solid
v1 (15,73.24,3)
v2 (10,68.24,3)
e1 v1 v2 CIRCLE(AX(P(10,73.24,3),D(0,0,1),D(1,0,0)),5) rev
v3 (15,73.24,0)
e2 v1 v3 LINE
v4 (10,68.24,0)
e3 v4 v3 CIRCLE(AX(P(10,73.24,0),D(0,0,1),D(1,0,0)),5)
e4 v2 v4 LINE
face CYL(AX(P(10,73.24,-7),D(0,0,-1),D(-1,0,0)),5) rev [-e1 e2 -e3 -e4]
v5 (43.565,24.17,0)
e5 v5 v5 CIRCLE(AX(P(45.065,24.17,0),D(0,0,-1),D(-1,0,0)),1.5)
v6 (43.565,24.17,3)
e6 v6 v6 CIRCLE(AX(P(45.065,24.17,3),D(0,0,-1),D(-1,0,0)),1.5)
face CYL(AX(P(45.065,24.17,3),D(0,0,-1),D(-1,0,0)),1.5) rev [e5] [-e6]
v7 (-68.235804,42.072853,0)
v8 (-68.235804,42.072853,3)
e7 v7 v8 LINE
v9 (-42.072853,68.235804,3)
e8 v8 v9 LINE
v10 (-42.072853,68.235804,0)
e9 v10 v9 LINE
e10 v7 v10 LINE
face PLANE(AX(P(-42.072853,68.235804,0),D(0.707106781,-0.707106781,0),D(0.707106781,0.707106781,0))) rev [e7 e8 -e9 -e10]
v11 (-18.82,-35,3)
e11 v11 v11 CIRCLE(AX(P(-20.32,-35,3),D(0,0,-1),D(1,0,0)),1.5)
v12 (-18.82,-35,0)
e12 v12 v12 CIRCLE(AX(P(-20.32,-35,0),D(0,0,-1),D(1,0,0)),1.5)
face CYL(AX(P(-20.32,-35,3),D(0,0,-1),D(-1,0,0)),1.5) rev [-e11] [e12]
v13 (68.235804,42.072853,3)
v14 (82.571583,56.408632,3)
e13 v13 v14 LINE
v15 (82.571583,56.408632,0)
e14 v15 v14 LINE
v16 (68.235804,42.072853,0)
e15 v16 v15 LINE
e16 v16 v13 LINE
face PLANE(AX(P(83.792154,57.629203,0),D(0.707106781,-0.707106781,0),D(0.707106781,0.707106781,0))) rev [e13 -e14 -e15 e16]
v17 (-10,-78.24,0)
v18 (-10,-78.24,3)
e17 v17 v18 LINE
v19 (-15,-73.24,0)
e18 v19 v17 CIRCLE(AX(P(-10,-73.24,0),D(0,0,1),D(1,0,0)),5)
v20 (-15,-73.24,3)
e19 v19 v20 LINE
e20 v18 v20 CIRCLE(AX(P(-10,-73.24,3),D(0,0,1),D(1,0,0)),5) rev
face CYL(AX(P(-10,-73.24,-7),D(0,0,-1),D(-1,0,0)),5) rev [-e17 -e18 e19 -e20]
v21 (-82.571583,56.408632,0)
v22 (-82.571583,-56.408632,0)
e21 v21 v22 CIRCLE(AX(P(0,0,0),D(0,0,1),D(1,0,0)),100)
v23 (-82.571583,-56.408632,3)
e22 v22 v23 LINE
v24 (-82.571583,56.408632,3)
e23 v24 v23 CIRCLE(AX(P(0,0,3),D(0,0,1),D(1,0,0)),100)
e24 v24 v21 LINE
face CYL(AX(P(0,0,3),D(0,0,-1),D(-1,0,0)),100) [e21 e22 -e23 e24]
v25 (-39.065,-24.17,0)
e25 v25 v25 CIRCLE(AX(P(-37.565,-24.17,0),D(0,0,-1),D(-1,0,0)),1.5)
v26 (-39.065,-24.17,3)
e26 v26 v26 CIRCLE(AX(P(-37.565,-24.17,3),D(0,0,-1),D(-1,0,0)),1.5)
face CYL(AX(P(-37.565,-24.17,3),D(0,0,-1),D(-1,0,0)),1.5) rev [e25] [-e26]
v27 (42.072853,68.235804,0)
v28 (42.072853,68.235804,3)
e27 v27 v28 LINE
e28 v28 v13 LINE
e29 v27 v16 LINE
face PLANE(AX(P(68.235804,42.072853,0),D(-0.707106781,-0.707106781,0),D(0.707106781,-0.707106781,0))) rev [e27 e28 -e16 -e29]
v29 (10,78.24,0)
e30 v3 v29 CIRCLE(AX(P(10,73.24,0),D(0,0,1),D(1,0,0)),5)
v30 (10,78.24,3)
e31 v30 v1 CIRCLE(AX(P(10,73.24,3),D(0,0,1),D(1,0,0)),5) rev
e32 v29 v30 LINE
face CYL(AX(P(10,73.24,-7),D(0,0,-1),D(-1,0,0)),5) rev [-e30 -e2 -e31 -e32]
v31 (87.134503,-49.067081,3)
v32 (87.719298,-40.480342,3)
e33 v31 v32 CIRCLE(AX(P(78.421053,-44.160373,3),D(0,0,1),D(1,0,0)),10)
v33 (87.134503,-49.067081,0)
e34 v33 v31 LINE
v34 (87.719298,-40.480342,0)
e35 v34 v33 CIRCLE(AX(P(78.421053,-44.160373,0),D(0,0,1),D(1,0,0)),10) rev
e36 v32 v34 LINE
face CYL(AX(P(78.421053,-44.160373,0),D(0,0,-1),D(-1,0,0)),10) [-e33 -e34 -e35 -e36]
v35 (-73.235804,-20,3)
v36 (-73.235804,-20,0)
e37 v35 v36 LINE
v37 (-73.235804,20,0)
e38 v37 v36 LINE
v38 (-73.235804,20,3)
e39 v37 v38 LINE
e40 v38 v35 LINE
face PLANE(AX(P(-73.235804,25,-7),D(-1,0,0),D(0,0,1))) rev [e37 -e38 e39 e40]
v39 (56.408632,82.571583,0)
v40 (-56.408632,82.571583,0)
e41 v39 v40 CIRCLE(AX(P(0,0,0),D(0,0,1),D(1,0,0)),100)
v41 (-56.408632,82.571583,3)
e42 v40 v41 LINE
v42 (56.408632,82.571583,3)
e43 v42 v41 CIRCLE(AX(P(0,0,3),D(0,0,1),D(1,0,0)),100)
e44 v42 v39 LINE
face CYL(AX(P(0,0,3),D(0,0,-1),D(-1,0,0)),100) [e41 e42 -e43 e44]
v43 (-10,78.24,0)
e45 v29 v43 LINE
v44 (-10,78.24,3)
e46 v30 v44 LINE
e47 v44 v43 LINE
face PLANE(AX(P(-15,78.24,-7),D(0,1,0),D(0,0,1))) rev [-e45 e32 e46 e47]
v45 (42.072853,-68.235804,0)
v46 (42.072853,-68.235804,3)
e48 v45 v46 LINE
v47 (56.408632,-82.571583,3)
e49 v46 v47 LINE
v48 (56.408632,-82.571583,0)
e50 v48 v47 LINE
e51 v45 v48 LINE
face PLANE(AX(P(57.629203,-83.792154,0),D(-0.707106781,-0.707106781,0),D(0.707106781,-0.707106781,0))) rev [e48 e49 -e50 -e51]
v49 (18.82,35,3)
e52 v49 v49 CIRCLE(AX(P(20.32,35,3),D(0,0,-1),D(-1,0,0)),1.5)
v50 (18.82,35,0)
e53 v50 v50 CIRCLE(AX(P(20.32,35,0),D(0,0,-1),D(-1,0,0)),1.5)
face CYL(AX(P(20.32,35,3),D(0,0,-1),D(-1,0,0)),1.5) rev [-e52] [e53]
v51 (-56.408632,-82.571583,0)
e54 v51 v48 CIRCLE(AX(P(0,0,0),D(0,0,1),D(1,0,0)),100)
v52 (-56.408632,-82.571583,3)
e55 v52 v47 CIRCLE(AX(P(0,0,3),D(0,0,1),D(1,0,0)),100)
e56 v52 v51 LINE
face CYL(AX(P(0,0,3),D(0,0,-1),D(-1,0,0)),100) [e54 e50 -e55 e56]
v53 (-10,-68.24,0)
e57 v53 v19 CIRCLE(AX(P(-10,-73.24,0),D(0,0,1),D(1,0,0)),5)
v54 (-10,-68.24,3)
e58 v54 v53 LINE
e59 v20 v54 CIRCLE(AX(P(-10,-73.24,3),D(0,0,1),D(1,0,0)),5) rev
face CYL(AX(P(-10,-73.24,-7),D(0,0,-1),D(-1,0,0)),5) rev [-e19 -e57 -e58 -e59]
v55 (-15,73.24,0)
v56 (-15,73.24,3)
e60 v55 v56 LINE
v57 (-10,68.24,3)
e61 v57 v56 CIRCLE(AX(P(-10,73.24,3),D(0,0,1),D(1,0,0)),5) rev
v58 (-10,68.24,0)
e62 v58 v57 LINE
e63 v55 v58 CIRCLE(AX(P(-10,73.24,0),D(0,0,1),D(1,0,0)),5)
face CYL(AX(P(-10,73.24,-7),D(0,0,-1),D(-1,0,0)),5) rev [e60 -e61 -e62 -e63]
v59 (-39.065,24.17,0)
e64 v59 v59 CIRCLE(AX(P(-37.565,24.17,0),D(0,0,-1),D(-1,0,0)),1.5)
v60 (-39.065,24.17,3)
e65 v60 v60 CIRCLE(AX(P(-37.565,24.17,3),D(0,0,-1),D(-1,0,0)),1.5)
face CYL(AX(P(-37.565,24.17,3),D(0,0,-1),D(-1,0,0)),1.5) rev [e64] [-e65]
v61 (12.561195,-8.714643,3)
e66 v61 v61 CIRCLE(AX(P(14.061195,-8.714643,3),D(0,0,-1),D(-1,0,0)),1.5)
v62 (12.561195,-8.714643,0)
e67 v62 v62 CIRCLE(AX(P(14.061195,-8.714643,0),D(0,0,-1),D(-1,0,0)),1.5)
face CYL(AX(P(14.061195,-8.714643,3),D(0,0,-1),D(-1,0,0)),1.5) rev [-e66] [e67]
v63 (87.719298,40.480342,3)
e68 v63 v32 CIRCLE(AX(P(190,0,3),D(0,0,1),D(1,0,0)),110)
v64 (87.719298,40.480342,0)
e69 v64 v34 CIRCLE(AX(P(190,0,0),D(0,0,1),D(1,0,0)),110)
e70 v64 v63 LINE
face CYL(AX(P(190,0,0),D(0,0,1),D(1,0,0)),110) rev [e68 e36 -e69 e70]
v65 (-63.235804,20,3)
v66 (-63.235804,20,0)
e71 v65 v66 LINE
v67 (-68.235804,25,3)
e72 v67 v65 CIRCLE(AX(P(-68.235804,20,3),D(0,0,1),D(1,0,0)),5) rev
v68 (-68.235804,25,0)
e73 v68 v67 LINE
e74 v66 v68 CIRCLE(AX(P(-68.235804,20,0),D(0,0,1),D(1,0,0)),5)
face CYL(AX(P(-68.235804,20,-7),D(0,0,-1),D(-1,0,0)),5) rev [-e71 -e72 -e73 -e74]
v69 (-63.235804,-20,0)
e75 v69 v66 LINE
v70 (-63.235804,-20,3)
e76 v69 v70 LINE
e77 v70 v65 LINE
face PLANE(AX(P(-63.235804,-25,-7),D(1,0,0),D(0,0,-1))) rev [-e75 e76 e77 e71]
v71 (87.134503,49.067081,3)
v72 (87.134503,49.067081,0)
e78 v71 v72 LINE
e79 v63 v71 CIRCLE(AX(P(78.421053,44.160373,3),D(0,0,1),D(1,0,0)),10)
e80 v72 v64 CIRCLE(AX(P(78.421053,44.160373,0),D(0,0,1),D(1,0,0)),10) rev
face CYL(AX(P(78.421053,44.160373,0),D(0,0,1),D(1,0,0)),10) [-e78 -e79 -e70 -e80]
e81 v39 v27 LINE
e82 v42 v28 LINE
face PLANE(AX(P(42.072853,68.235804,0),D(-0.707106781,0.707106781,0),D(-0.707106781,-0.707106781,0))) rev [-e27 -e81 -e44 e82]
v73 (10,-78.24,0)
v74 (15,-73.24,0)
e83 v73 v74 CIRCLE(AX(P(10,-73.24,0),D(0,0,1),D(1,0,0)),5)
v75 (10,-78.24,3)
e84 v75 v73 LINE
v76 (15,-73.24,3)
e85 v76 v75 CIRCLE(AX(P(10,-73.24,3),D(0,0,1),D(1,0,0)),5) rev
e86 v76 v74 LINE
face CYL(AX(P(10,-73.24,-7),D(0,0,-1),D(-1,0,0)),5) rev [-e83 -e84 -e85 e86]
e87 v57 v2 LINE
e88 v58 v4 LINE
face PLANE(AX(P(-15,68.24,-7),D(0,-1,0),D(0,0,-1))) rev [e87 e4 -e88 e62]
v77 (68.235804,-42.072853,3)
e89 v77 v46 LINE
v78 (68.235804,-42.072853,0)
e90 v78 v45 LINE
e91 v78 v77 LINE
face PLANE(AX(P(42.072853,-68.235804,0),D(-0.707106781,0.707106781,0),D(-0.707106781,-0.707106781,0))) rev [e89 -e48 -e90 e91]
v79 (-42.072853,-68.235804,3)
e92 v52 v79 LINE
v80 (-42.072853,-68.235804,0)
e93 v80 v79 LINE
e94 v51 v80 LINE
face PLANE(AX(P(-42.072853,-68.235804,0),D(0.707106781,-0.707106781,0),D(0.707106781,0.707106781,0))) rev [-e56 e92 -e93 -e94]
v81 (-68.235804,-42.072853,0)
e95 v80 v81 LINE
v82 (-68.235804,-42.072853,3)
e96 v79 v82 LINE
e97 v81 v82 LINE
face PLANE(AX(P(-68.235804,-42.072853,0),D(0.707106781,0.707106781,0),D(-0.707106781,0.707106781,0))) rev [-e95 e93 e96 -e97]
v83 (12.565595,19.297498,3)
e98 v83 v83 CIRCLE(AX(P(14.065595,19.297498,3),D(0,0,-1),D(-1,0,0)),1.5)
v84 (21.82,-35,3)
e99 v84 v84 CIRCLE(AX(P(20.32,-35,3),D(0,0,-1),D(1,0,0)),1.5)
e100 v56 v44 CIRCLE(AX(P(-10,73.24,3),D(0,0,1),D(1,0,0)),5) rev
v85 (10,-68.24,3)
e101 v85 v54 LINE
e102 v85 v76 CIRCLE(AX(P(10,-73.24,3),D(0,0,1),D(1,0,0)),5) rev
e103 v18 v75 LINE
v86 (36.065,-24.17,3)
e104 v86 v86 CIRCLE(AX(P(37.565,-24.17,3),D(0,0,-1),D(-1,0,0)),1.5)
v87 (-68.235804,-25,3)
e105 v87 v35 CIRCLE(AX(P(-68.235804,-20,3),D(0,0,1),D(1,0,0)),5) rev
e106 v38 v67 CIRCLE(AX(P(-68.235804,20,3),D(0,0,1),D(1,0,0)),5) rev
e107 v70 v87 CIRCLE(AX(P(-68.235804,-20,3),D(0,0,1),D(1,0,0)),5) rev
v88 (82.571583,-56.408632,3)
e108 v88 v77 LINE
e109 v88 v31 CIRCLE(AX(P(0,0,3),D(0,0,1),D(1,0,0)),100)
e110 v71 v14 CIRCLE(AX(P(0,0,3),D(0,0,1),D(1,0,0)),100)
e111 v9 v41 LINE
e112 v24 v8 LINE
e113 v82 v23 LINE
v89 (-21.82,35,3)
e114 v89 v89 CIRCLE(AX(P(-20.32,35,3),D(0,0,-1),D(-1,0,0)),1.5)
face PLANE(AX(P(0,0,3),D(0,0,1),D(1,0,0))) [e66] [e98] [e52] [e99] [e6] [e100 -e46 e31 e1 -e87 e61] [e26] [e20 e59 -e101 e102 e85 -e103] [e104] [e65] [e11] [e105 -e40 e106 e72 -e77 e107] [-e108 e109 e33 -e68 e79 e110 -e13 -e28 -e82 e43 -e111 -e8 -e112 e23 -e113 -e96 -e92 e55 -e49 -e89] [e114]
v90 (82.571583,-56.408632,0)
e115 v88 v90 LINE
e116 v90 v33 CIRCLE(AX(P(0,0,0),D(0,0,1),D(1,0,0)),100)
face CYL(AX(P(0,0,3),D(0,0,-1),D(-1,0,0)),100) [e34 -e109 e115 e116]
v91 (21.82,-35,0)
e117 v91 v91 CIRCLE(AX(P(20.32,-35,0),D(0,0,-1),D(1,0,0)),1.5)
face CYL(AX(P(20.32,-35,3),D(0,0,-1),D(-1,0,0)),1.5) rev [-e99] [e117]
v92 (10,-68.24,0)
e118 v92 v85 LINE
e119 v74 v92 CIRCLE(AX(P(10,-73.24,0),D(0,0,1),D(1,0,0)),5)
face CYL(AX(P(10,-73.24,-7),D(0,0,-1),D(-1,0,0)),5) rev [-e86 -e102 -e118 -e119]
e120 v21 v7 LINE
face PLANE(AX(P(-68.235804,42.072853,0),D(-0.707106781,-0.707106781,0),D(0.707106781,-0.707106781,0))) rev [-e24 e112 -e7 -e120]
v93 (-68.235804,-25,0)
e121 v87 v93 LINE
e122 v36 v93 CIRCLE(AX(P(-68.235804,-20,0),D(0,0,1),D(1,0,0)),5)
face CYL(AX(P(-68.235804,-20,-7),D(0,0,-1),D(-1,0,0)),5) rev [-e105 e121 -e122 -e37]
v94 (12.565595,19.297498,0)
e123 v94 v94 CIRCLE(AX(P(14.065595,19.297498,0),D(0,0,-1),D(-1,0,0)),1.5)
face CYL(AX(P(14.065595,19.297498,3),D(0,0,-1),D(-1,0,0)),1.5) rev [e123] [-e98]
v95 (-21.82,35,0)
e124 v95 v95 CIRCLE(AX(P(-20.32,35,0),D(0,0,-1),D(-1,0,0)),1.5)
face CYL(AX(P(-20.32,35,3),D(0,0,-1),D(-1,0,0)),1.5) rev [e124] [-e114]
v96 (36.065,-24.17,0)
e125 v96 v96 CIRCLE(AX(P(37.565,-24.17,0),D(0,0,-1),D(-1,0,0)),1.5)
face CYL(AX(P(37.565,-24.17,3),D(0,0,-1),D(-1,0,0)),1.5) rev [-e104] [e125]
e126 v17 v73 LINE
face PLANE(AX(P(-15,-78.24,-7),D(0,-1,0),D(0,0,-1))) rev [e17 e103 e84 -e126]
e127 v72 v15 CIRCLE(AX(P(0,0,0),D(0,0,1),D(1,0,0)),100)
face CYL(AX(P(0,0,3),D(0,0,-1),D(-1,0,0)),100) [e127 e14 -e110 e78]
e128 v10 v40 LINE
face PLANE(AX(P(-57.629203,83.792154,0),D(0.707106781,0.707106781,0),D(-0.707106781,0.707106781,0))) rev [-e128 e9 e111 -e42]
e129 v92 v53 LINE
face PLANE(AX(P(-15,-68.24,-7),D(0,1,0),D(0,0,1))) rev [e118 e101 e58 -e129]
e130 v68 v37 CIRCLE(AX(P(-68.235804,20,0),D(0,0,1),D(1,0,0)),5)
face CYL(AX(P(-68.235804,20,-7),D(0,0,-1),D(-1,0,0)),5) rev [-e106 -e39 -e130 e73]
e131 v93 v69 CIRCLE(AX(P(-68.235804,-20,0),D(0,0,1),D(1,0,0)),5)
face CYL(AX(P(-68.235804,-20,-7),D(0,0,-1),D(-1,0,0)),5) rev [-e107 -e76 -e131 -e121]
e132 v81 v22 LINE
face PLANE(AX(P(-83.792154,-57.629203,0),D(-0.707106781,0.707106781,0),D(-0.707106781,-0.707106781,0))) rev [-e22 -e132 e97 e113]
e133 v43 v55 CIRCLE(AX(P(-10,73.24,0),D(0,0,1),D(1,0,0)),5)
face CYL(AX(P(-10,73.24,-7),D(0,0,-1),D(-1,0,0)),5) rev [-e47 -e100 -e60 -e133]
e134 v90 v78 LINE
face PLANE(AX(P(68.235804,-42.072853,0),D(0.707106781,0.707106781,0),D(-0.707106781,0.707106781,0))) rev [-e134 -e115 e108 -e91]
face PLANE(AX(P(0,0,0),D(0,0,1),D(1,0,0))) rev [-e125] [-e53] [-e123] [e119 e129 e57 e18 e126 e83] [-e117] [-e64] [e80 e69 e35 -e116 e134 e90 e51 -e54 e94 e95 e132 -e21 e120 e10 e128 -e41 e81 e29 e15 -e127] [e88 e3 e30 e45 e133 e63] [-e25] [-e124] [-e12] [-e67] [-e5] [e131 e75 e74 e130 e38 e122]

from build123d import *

# Parameters (mm, degrees)
CROQUIS1_R              = 100
SALIENTE_EXTRUIR1_DEPTH = 3
CROQUIS3_R              = 110
CORTAR_EXTRUIR1_DEPTH   = 3
REDONDEO1_R             = 10
CORTAR_EXTRUIR2_DEPTH   = 142.453172607
CROQUIS6_W              = 10
CROQUIS6_H              = 50
CROQUIS6_W_2            = 30
CROQUIS6_H_2            = 10
CORTAR_EXTRUIR4_DEPTH   = 10
REDONDEO3_R             = 5
CROQUIS7_R              = 1.5
CORTAR_EXTRUIR5_DEPTH   = 142.453172607
CROQUIS8_R              = 1.5
CORTAR_EXTRUIR6_DEPTH   = 142.453172607


with BuildPart() as part:
    # Croquis1 → Saliente-Extruir1 (new body)
    with BuildSketch(Plane.XY):
        Circle(CROQUIS1_R)
    extrude(amount=SALIENTE_EXTRUIR1_DEPTH)

    # Croquis3 → Cortar-Extruir1 (cut)
    with BuildSketch(Plane.XY.offset(3)):
        with Locations((190, 0)):
            Circle(CROQUIS3_R)
    extrude(amount=-CORTAR_EXTRUIR1_DEPTH, mode=Mode.SUBTRACT)

    # Redondeo1
    redondeo1_edges = [part.edges().sort_by_distance(p)[0] for p in [
        (89.473684211, -44.659375654, 1.5),
        (89.473684211, 44.659375654, 1.5),
    ]]
    fillet(redondeo1_edges, radius=REDONDEO1_R)

    # Croquis4 → Cortar-Extruir2 (cut, through all)
    with BuildSketch(Plane.XY.offset(3)):
        Polygon((-57.629202667, -83.792153571), (-83.792153571, -57.629202667), (-68.235804385, -42.072853481), (-42.072853481, -68.235804385), align=None)
        Polygon((-57.629202667, 83.792153571), (-42.072853481, 68.235804385), (-68.235804385, 42.072853481), (-83.792153571, 57.629202667), align=None)
        Polygon((83.792153571, 57.629202667), (68.235804385, 42.072853481), (42.072853481, 68.235804385), (57.629202667, 83.792153571), align=None)
        Polygon((57.629202667, -83.792153571), (42.072853481, -68.235804385), (68.235804385, -42.072853481), (83.792153571, -57.629202667), align=None)
    extrude(amount=-CORTAR_EXTRUIR2_DEPTH, mode=Mode.SUBTRACT)

    # Croquis6 → Cortar-Extruir4 (cut)
    with BuildSketch(Plane.XY.offset(3)):
        with Locations((-68.235804385, 0)):
            Rectangle(CROQUIS6_W, CROQUIS6_H)
        with Locations((0, 73.24)):
            Rectangle(CROQUIS6_W_2, CROQUIS6_H_2)
        with Locations((0, -73.24)):
            Rectangle(CROQUIS6_W_2, CROQUIS6_H_2)
    extrude(amount=-CORTAR_EXTRUIR4_DEPTH, mode=Mode.SUBTRACT)

    # Redondeo3
    redondeo3_edges = [part.edges().sort_by_distance(p)[0] for p in [
        (15, -78.24, 1.5),
        (-15, -78.24, 1.5),
        (15, -68.24, 1.5),
        (-15, -68.24, 1.5),
        (-73.235804385, -25, 1.5),
        (-63.235804385, -25, 1.5),
        (-73.235804385, 25, 1.5),
        (-63.235804385, 25, 1.5),
        (-15, 68.24, 1.5),
        (15, 68.24, 1.5),
        (-15, 78.24, 1.5),
        (15, 78.24, 1.5),
    ]]
    fillet(redondeo3_edges, radius=REDONDEO3_R - 0.0001)  # a hair under: the kernel refuses the full size

    # Croquis7 → Cortar-Extruir5 (cut, through all)
    with BuildSketch(Plane(origin=(0, 0, 0), x_dir=(-1, 0, 0), z_dir=(0, 0, -1))):
        with Locations((37.565, -24.17)):
            Circle(CROQUIS7_R)
        with Locations((-37.565, -24.17)):
            Circle(CROQUIS7_R)
        with Locations((-45.065, 24.17)):
            Circle(CROQUIS7_R)
        with Locations((37.565, 24.17)):
            Circle(CROQUIS7_R)
        with Locations((-14.06559482, 19.297497716)):
            Circle(CROQUIS7_R)
        with Locations((-14.061195262, -8.714642909)):
            Circle(CROQUIS7_R)
    extrude(amount=-CORTAR_EXTRUIR5_DEPTH, mode=Mode.SUBTRACT)

    # Croquis8 → Cortar-Extruir6 (cut, through all)
    with BuildSketch(Plane(origin=(0, 0, 0), x_dir=(-1, 0, 0), z_dir=(0, 0, -1))):
        with Locations((-20.32, 35)):
            Circle(CROQUIS8_R)
        with Locations((20.32, 35)):
            Circle(CROQUIS8_R)
        with Locations(Location((20.32, -35, 0), (0, 0, 180))):
            Circle(CROQUIS8_R)
        with Locations(Location((-20.32, -35, 0), (0, 0, 180))):
            Circle(CROQUIS8_R)
    extrude(amount=-CORTAR_EXTRUIR6_DEPTH, mode=Mode.SUBTRACT)


solid = part.part
